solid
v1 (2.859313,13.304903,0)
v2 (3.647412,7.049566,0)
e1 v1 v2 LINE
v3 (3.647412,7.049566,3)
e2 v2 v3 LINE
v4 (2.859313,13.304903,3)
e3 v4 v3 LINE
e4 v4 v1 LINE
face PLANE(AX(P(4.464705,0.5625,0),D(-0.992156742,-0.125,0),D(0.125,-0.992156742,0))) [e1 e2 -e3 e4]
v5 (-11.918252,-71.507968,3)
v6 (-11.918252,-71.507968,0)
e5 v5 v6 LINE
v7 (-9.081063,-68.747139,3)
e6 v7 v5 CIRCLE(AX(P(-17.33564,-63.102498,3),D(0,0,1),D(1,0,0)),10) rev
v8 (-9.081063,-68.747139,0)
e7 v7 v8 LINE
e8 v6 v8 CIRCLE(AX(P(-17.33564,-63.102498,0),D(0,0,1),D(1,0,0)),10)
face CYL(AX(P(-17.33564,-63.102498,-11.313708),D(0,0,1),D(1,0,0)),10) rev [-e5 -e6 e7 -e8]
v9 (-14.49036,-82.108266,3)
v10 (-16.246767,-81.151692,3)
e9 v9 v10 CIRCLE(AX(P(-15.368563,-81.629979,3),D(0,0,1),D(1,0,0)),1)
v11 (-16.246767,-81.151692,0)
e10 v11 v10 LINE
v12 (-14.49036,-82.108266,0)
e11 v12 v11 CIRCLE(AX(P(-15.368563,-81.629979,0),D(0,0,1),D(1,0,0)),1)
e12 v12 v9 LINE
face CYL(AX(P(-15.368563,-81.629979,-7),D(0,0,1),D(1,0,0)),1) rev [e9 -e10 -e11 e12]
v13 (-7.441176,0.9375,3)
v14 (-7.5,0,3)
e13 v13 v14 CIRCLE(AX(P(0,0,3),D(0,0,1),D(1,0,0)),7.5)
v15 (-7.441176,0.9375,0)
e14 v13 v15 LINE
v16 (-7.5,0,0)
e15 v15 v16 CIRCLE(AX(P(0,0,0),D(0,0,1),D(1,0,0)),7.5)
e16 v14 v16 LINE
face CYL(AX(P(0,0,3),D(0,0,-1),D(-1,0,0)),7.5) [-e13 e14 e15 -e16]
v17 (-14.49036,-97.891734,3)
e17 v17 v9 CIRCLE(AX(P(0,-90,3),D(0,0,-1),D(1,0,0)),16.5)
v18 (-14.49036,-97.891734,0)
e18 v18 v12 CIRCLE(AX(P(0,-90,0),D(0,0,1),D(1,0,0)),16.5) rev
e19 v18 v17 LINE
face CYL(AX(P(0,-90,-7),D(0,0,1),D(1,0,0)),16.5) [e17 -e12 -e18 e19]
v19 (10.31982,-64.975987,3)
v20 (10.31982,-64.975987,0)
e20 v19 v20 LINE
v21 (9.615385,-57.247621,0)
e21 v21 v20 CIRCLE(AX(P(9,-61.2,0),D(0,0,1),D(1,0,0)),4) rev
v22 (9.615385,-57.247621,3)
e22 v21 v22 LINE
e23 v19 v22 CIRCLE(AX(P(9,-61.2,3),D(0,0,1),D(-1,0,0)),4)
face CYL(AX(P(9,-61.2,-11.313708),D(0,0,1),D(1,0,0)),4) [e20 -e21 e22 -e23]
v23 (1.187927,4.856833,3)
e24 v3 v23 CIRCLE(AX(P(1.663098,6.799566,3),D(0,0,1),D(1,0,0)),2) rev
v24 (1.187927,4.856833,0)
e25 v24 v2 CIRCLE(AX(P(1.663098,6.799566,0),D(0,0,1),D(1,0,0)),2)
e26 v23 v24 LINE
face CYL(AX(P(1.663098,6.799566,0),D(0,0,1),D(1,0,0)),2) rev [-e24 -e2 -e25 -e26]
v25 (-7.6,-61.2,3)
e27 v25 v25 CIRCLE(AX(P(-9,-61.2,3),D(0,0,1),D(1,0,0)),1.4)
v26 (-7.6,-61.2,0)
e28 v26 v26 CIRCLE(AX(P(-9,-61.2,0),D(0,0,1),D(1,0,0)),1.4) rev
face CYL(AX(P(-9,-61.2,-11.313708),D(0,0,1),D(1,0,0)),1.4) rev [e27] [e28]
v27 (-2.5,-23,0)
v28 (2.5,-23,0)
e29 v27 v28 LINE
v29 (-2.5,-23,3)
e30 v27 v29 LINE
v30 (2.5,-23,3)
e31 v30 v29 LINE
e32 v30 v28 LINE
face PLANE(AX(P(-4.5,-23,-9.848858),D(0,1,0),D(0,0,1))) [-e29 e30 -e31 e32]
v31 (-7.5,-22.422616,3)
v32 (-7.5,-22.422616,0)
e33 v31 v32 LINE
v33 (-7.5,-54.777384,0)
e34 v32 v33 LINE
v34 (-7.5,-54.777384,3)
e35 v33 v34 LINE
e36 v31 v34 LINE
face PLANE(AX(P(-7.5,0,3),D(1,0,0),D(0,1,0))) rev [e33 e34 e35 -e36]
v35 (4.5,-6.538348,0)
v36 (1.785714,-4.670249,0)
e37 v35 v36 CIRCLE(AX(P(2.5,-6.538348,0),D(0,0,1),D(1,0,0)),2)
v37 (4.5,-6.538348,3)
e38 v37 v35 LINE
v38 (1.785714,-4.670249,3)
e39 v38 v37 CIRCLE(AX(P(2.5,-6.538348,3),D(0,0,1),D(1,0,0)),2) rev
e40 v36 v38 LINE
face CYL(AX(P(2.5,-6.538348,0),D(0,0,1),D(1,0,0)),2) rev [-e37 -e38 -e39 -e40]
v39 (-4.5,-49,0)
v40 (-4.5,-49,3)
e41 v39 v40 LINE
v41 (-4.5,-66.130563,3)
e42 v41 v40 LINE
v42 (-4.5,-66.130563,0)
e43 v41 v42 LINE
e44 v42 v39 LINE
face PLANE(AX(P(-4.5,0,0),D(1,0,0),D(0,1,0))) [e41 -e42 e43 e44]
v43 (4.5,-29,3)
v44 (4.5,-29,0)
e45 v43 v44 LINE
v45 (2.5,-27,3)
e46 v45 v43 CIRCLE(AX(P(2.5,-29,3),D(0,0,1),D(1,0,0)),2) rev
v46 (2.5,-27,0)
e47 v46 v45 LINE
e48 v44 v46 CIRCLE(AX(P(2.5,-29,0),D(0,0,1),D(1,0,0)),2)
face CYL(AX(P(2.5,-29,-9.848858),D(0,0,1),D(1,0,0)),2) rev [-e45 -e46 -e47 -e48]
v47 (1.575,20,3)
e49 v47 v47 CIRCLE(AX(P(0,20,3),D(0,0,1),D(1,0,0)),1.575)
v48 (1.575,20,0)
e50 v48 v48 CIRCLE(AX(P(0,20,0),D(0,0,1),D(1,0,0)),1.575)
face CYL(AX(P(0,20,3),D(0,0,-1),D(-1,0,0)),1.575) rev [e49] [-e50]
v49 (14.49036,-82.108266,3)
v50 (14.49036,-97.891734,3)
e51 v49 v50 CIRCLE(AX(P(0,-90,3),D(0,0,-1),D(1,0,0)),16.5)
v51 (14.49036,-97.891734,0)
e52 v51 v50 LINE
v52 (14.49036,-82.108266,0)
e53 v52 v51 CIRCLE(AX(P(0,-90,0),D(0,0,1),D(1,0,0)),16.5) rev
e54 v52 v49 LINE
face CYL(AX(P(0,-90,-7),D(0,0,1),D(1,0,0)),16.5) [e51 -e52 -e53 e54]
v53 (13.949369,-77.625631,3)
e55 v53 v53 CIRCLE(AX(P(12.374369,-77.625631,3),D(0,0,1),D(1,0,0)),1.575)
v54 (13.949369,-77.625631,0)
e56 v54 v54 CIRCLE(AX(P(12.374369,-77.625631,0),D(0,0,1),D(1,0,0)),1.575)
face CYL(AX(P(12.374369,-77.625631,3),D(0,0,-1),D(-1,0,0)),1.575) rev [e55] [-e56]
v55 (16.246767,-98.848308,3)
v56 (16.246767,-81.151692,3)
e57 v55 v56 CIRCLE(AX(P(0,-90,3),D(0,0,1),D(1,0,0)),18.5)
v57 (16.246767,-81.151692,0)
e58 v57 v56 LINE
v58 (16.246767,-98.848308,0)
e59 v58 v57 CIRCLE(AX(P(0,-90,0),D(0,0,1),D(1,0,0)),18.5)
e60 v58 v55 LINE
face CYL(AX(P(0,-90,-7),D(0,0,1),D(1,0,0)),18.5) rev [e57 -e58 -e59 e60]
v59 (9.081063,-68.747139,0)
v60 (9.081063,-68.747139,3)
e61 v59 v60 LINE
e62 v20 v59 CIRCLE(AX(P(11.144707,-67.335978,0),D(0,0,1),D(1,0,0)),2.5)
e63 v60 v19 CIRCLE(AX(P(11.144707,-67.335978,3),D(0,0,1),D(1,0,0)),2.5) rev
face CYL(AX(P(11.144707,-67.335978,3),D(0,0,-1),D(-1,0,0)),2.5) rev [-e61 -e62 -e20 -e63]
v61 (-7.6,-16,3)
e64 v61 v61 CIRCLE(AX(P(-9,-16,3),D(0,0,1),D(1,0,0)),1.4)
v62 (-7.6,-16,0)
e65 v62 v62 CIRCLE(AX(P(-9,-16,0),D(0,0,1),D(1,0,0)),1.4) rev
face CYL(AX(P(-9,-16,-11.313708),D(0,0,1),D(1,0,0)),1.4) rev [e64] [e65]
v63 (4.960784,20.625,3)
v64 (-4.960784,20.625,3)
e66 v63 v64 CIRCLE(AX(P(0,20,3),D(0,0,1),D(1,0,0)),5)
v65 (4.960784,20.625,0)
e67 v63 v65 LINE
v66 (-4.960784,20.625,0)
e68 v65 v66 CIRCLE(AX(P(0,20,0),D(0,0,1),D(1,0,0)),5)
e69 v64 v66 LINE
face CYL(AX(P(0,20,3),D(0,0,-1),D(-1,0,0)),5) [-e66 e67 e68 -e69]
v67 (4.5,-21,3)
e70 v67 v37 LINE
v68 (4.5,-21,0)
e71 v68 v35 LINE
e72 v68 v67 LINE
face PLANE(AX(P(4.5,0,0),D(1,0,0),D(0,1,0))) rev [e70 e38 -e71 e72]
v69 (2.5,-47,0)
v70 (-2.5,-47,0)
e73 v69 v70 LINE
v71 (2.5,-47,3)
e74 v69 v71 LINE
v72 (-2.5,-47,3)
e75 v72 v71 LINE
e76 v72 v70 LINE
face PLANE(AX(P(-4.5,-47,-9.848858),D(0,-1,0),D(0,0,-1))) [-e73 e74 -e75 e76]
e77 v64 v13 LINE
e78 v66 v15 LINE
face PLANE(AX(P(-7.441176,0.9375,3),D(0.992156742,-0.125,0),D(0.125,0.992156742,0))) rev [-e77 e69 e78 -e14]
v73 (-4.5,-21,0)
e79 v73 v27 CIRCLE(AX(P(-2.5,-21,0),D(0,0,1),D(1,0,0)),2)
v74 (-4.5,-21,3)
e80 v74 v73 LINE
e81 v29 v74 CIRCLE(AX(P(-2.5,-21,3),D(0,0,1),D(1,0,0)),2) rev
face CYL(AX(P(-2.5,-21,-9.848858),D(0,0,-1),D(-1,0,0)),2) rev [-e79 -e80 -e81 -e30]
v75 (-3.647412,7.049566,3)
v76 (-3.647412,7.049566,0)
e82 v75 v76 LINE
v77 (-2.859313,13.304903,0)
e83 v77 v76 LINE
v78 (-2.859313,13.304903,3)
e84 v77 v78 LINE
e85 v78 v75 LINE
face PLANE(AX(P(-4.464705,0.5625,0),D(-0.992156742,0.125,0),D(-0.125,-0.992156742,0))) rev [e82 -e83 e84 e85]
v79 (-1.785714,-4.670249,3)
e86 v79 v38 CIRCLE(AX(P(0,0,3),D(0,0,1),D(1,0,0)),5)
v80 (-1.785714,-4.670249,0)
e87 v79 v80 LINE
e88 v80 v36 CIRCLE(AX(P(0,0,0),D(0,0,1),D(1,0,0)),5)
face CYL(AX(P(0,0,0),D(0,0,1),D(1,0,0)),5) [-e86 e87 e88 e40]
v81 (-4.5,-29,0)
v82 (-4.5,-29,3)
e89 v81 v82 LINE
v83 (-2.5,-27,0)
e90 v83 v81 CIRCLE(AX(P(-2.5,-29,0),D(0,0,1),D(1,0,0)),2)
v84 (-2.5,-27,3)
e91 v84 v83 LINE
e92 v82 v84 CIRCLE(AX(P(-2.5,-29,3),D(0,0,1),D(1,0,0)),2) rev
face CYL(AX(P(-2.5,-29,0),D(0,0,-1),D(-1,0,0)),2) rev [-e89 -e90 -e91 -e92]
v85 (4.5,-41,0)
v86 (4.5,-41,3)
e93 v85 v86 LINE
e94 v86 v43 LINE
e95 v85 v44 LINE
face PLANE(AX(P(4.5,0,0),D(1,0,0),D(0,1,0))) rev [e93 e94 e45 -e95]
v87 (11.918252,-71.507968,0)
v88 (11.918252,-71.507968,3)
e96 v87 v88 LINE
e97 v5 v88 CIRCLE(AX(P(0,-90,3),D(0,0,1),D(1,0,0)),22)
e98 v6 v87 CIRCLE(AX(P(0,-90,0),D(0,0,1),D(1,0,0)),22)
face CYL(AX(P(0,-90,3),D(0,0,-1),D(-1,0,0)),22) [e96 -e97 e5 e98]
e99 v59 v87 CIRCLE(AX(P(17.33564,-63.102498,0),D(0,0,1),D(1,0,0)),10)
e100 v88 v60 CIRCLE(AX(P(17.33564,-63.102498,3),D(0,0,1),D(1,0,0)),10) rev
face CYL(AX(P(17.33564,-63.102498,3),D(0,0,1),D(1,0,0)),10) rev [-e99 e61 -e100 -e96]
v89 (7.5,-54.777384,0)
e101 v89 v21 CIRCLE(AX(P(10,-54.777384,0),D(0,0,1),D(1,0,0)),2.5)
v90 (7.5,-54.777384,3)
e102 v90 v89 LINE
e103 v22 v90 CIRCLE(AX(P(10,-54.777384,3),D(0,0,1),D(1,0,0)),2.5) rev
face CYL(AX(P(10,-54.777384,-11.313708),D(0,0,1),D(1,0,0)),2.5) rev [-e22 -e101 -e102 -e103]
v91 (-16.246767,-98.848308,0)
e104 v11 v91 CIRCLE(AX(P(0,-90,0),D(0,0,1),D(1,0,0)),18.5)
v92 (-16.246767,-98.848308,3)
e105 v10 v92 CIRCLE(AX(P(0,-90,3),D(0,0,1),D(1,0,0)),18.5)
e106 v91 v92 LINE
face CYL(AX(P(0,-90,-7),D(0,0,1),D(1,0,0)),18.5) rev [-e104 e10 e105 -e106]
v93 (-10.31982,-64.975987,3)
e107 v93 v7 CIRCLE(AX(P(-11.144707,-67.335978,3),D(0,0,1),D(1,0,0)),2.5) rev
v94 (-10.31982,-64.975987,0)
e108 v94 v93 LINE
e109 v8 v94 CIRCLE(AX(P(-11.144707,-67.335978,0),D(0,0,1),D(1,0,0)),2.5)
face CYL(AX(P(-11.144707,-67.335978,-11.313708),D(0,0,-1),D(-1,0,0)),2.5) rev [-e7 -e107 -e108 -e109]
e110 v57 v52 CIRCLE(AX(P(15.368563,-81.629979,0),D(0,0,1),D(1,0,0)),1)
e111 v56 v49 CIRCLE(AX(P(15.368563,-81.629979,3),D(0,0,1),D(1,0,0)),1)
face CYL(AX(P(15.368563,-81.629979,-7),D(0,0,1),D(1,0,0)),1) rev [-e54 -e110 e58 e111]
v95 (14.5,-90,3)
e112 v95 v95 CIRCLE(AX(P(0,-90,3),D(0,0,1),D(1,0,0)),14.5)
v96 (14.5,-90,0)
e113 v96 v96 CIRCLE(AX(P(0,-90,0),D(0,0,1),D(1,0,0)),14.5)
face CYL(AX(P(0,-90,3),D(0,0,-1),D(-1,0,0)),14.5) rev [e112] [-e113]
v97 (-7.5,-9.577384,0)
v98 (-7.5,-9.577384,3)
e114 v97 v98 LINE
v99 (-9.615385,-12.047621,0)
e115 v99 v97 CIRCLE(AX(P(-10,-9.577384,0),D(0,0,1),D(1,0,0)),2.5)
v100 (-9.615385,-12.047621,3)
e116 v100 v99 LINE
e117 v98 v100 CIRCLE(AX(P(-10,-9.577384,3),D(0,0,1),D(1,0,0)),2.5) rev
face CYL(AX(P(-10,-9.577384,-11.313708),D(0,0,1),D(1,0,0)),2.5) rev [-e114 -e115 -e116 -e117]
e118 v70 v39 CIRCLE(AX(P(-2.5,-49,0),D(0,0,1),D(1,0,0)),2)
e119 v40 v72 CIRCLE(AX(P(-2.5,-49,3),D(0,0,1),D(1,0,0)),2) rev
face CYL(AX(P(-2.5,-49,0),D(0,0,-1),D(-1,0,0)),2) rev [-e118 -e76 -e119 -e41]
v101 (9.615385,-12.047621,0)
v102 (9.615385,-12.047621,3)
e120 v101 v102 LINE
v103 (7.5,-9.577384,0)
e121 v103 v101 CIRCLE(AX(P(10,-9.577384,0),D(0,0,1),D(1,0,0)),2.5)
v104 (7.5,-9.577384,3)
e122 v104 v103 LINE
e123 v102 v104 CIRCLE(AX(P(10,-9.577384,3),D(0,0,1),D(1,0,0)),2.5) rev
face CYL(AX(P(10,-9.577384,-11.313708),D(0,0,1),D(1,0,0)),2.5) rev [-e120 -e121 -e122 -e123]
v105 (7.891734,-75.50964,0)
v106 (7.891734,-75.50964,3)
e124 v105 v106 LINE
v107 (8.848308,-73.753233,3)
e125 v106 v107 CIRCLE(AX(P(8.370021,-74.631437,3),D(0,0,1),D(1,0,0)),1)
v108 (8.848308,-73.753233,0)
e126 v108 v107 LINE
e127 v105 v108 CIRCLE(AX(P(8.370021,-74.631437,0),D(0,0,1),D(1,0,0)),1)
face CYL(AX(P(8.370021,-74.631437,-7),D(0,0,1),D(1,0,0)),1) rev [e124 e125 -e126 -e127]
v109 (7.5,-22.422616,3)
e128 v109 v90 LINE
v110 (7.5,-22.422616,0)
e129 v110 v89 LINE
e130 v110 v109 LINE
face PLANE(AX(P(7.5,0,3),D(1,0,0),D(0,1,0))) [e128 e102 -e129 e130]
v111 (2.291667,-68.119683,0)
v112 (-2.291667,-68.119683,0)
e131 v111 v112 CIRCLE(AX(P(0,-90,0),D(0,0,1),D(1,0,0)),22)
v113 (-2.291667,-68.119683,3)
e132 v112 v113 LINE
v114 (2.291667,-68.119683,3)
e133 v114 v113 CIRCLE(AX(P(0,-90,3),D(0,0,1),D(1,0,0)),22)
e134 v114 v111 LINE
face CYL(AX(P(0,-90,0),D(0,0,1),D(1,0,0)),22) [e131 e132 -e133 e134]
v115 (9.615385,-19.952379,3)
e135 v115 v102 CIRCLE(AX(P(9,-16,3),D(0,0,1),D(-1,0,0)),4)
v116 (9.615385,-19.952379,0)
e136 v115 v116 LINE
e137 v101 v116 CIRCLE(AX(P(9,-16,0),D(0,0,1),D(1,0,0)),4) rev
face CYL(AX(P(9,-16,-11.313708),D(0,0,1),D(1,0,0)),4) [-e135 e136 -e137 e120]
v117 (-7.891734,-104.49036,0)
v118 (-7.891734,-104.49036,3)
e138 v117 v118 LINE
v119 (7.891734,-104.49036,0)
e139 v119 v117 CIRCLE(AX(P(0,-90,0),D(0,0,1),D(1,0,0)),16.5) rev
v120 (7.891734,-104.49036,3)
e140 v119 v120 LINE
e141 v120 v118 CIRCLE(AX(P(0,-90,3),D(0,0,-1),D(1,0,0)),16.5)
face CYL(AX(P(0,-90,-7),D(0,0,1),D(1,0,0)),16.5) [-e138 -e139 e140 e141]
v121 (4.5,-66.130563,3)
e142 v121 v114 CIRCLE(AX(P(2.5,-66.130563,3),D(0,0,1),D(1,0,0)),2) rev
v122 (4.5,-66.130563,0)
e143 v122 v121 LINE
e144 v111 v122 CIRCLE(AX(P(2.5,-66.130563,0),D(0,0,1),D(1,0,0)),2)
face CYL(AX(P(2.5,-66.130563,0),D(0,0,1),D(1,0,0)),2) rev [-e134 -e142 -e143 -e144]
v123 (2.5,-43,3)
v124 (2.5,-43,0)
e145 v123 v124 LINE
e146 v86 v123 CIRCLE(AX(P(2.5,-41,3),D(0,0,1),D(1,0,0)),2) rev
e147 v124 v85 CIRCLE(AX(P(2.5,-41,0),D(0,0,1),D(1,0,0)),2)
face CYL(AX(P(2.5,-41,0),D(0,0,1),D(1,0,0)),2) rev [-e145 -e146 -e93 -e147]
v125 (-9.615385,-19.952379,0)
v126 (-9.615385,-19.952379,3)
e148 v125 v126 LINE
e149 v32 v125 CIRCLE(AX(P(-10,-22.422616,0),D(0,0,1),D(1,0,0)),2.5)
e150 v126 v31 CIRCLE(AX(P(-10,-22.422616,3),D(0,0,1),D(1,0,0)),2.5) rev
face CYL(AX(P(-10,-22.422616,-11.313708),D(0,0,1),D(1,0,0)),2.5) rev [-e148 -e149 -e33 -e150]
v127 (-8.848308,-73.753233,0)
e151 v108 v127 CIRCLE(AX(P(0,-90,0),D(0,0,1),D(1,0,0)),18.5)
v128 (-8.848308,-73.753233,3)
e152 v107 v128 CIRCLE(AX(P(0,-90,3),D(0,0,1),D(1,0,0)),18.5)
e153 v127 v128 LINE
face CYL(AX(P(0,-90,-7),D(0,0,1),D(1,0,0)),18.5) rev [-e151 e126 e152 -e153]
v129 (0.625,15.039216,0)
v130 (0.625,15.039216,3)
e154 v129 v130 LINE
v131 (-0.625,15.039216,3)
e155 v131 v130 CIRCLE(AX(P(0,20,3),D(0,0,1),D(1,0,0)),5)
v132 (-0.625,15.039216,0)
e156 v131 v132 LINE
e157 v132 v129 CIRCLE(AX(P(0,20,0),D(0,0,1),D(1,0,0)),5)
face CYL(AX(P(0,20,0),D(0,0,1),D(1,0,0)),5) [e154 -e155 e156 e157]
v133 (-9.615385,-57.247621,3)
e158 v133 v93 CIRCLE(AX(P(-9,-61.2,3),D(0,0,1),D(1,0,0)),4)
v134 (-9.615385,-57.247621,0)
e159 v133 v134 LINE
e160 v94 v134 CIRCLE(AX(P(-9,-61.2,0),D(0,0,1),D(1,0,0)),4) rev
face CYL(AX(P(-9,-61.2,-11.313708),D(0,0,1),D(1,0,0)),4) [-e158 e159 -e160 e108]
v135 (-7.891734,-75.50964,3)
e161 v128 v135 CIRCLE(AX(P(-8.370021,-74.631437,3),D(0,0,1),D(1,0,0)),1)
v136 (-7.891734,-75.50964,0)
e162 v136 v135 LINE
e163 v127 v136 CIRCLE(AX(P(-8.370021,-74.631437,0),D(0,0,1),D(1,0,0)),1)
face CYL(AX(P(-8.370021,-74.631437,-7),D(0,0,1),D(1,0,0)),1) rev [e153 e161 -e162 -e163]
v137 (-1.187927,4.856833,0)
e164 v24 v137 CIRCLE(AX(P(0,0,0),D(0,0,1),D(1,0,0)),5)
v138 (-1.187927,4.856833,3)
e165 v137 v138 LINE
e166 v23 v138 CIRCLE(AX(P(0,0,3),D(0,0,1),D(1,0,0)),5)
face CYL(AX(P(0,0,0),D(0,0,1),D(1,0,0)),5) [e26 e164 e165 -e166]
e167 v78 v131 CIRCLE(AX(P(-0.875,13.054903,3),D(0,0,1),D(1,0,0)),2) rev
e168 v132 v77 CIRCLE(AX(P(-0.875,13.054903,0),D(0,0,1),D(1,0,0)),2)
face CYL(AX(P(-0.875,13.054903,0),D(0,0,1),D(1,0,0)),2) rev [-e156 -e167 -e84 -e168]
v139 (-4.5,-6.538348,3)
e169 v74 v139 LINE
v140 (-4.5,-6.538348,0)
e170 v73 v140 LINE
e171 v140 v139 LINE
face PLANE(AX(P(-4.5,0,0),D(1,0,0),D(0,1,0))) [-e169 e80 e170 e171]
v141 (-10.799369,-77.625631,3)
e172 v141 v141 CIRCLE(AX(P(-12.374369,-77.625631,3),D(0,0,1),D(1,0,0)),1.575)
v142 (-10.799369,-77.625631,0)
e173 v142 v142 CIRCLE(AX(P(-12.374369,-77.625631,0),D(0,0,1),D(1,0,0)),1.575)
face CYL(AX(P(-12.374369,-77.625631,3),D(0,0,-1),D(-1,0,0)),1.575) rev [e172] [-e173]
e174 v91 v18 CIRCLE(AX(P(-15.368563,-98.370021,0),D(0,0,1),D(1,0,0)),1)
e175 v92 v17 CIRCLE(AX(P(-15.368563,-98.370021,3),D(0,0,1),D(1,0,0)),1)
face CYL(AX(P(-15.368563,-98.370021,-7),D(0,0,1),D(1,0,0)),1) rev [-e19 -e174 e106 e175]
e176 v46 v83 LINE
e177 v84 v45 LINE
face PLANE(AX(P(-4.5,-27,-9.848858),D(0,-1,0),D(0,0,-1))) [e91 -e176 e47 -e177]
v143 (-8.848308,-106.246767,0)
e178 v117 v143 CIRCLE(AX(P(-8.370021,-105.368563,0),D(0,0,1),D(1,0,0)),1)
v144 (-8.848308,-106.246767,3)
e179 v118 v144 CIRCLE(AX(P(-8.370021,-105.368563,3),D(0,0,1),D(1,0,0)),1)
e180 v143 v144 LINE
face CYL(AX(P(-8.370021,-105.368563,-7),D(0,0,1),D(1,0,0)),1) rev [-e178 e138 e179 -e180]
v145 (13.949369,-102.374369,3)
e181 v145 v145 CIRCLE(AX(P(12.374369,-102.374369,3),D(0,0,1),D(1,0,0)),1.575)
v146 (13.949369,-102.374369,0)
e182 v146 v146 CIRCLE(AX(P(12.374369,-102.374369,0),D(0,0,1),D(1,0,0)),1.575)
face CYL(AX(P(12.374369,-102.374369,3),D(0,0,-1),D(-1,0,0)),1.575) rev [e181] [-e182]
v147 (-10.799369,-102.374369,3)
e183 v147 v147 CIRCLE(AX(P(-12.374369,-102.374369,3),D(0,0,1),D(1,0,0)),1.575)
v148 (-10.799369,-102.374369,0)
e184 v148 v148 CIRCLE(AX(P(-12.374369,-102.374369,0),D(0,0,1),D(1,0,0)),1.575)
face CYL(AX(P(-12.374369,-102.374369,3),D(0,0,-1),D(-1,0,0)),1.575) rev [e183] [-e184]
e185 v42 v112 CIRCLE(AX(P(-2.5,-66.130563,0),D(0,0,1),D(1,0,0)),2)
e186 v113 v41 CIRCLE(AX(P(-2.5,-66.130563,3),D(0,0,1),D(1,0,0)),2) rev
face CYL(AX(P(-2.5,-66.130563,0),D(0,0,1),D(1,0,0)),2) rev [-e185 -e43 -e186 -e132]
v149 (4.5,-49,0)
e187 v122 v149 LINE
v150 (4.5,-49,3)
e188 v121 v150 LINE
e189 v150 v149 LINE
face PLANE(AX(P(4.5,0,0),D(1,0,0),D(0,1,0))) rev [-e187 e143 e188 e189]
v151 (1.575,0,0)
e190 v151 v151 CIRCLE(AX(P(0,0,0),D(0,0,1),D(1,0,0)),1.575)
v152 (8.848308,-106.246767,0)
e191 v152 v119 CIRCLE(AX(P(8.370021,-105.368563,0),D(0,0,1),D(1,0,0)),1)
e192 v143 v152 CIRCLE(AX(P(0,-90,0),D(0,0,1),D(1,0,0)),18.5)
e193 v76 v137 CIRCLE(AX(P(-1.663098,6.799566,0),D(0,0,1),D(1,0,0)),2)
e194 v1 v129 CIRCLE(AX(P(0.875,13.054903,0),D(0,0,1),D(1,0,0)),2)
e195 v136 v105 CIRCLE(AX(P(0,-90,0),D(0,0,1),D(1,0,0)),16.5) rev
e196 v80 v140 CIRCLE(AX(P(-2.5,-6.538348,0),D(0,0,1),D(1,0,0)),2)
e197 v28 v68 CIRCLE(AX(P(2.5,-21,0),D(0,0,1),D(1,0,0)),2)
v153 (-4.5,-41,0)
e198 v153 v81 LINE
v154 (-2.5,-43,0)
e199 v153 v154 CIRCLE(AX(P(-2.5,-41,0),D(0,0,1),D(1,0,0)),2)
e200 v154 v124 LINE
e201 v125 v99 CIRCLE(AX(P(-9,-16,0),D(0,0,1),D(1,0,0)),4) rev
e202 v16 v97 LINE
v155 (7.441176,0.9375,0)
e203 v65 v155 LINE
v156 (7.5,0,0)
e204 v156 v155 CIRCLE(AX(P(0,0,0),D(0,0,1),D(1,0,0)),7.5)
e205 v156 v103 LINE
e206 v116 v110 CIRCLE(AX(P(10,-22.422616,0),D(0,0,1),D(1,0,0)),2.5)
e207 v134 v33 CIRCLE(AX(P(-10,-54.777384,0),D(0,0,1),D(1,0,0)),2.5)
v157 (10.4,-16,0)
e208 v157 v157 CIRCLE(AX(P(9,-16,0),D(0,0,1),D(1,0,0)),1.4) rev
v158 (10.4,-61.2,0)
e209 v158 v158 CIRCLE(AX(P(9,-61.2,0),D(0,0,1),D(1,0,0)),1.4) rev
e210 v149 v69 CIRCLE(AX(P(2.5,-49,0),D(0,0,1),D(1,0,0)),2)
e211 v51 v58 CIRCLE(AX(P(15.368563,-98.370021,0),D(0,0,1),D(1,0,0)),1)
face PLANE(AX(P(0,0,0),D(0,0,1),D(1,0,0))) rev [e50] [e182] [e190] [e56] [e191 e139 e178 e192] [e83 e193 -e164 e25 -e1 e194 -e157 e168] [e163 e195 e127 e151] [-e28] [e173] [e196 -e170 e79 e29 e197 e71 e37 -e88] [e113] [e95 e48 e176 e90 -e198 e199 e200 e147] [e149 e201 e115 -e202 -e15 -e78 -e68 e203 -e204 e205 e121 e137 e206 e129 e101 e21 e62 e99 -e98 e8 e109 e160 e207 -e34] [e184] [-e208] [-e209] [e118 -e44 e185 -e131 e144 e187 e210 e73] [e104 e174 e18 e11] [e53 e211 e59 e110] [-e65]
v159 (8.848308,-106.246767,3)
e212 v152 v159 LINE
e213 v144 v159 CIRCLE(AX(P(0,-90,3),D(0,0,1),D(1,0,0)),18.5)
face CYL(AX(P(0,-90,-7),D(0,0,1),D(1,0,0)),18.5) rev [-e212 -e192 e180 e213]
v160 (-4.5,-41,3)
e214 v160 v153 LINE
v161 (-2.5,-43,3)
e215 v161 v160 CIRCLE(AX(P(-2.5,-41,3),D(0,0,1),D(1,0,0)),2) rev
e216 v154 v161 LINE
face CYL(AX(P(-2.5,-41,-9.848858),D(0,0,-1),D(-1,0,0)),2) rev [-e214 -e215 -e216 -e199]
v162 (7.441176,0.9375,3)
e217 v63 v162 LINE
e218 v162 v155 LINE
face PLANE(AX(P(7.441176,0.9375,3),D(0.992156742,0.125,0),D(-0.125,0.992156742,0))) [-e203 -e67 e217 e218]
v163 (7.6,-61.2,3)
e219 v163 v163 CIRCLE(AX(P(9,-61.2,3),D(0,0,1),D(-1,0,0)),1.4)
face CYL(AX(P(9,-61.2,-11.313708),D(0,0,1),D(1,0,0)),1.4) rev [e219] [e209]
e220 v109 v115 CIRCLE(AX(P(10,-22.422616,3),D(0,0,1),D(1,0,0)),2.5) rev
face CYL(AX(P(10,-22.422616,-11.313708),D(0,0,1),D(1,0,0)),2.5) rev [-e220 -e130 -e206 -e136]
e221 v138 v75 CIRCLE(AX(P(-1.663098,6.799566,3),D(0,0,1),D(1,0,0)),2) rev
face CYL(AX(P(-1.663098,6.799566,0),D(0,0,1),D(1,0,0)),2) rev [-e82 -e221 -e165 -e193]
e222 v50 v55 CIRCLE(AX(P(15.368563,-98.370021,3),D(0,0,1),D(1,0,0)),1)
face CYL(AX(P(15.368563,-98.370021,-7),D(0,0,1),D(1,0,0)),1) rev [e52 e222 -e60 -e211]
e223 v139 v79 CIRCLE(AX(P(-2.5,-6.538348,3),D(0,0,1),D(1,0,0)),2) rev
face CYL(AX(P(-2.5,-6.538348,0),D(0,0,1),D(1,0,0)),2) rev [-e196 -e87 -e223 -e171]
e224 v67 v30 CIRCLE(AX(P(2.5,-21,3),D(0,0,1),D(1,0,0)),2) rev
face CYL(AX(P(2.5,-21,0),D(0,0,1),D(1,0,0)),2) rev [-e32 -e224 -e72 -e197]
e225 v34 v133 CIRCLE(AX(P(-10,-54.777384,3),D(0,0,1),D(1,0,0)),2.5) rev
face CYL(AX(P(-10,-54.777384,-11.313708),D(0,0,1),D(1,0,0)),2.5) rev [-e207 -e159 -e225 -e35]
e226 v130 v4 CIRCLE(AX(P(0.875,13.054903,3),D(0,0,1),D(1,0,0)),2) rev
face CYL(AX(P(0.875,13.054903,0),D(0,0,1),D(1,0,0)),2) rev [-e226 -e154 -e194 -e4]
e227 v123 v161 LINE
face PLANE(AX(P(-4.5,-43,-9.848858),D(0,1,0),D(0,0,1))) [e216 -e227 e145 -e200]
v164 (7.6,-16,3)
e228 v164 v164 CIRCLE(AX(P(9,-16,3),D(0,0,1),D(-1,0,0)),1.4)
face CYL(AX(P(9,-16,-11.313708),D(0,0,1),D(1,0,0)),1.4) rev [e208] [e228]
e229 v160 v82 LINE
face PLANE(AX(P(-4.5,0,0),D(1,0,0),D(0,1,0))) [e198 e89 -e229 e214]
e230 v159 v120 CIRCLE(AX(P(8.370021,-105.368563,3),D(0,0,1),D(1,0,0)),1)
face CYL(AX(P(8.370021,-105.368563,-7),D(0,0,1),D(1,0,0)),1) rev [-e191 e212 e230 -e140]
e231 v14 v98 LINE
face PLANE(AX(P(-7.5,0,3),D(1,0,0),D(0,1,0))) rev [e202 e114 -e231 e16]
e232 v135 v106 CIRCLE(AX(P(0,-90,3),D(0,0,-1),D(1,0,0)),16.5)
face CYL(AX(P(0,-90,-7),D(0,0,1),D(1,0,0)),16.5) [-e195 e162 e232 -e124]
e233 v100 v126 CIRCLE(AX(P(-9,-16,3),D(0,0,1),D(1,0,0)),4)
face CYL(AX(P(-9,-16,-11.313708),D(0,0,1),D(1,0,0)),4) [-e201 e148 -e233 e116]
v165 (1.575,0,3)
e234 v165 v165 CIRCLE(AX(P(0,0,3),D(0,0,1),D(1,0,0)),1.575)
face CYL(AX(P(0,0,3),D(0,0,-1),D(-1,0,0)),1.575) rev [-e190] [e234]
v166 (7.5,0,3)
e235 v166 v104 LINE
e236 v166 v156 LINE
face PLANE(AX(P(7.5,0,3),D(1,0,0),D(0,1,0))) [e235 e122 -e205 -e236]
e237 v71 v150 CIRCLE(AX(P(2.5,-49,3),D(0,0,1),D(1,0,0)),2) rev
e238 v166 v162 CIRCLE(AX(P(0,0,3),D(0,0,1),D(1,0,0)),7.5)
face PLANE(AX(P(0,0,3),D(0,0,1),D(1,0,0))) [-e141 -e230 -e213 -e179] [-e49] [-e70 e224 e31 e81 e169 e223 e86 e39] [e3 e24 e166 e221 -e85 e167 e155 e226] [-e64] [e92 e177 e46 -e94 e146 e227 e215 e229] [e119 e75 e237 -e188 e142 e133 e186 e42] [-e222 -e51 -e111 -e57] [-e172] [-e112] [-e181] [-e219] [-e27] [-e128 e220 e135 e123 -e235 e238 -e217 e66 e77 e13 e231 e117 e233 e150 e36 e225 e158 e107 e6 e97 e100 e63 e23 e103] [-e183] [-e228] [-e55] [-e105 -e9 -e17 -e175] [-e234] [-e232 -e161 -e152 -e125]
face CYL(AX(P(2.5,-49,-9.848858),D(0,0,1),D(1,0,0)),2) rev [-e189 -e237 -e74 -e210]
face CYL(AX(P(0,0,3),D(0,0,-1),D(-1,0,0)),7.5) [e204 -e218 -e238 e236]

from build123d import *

# Parameters (mm, degrees)
SKETCH_1_R          = 1.575
SKETCH_1_R_2        = 14.5
EXTRUDE_1_DEPTH     = 3
CUT_EXTRUDE_START   = -3
CUT_EXTRUDE_1_DEPTH = 3
SKETCH_3_W          = 9
SKETCH_3_H          = 4
EXTRUDE_2_DEPTH     = 3
SKETCH_4_R          = 4
SKETCH_4_R_2        = 1.4
EXTRUDE_3_DEPTH     = 3
FILLET_1_R          = 2
FILLET_2_R          = 10
FILLET_3_R          = 2.5
CUT_EXTRUDE_2_DEPTH = 10


with BuildPart() as part:
    # 草图1 → 凸台-拉伸1 (new body)
    with BuildSketch(Plane.XY):
        with BuildLine():
            ThreePointArc((7.5, 0), (7.485279444, 0.469671844), (7.441175562, 0.9375))
            Line((7.441175562, 0.9375), (4.960783708, 20.625))
            ThreePointArc((4.960783708, 20.625), (0, 25), (-4.960783708, 20.625))
            Line((-4.960783708, 20.625), (-7.441175562, 0.9375))
            ThreePointArc((-7.441175562, 0.9375), (-7.485279444, 0.469671844), (-7.5, 0))
            Line((-7.5, 0), (-7.5, -69.31788212))
            ThreePointArc((-7.5, -69.31788212), (0, -112), (7.5, -69.31788212))
            Line((7.5, -69.31788212), (7.5, 0))
        make_face()
        with Locations((-12.374368671, -102.374368671)):
            Circle(SKETCH_1_R, mode=Mode.SUBTRACT)
        with Locations((-12.374368671, -77.625631329)):
            Circle(SKETCH_1_R, mode=Mode.SUBTRACT)
        with Locations((0, -90)):
            Circle(SKETCH_1_R_2, mode=Mode.SUBTRACT)
        with Locations((12.374368671, -102.374368671)):
            Circle(SKETCH_1_R, mode=Mode.SUBTRACT)
        with Locations((12.374368671, -77.625631329)):
            Circle(SKETCH_1_R, mode=Mode.SUBTRACT)
        Circle(SKETCH_1_R, mode=Mode.SUBTRACT)
        with Locations((0, 20)):
            Circle(SKETCH_1_R, mode=Mode.SUBTRACT)
    extrude(amount=EXTRUDE_1_DEPTH)

    # 草图2 → 切除-拉伸1 (cut)
    with BuildSketch(Plane.XY.offset(3).offset(CUT_EXTRUDE_START)):
        with BuildLine():
            Line((0, -68), (0, -5))
            ThreePointArc((0, -5), (-2.655442773, -4.236581603), (-4.5, -2.179449472))
            Line((-4.5, -2.179449472), (-4.5, -68.465144533))
            ThreePointArc((-4.5, -68.465144533), (-2.261988032, -68.116595097), (0, -68))
        make_face()
        with BuildLine():
            ThreePointArc((4.5, -2.179449472), (2.655442773, -4.236581603), (0, -5))
            Line((0, -5), (0, -68))
            ThreePointArc((0, -68), (2.261988032, -68.116595097), (4.5, -68.465144533))
            Line((4.5, -68.465144533), (4.5, -2.179449472))
        make_face()
        with BuildLine():
            Line((-2.557135445, 15.70336663), (-4.192274153, 2.724855487))
            ThreePointArc((-4.192274153, 2.724855487), (0, 5), (4.192274153, 2.724855487))
            Line((4.192274153, 2.724855487), (2.557135445, 15.70336663))
            ThreePointArc((2.557135445, 15.70336663), (0, 15), (-2.557135445, 15.70336663))
        make_face()
    extrude(amount=CUT_EXTRUDE_1_DEPTH, mode=Mode.SUBTRACT)

    # 草图3 → 凸台-拉伸2 (add)
    with BuildSketch(Plane.XY.offset(3)):
        with Locations((0, -45)):
            Rectangle(SKETCH_3_W, SKETCH_3_H)
        with Locations((0, -25)):
            Rectangle(SKETCH_3_W, SKETCH_3_H)
    extrude(amount=-EXTRUDE_2_DEPTH)

    # 草图4 → 凸台-拉伸3 (add)
    # profile 1 of 4: a face of its own
    with BuildSketch(Plane.XY.offset(3)):
        with Locations((-9, -16)):
            Circle(SKETCH_4_R)
        with Locations((-9, -16)):
            Circle(SKETCH_4_R_2, mode=Mode.SUBTRACT)
    # profile 2 of 4: a face of its own
    with BuildSketch(Plane.XY.offset(3)):
        with Locations((-9, -61.2)):
            Circle(SKETCH_4_R)
        with Locations((-9, -61.2)):
            Circle(SKETCH_4_R_2, mode=Mode.SUBTRACT)
    # profile 3 of 4: a face of its own
    with BuildSketch(Plane.XY.offset(3)):
        with Locations((9, -61.2)):
            Circle(SKETCH_4_R)
        with Locations((9, -61.2)):
            Circle(SKETCH_4_R_2, mode=Mode.SUBTRACT)
    # profile 4 of 4: a face of its own
    with BuildSketch(Plane.XY.offset(3)):
        with Locations((9, -16)):
            Circle(SKETCH_4_R)
        with Locations((9, -16)):
            Circle(SKETCH_4_R_2, mode=Mode.SUBTRACT)
    extrude(amount=-EXTRUDE_3_DEPTH)

    # 圆角1
    fillet_1_edges = [part.edges().sort_by_distance(p)[0] for p in [
        (-4.5, -27, 1.5),
        (-4.5, -23, 1.5),
        (4.5, -23, 1.5),
        (4.5, -27, 1.5),
        (-2.557135445, 15.70336663, 1.5),
        (2.557135445, 15.70336663, 1.5),
        (4.192274153, 2.724855487, 1.5),
        (-4.192274153, 2.724855487, 1.5),
        (4.5, -68.465144533, 1.5),
        (-4.5, -68.465144533, 1.5),
        (-4.5, -2.179449472, 1.5),
        (4.5, -2.179449472, 1.5),
        (-4.5, -47, 1.5),
        (-4.5, -43, 1.5),
        (4.5, -43, 1.5),
        (4.5, -47, 1.5),
    ]]
    fillet(fillet_1_edges, radius=FILLET_1_R)

    # 圆角2
    # the kernel refuses this fillet: 10 mm, written as the material it adds along each edge
    with BuildSketch(Plane(origin=(-7.5, -69.31788212, 0), x_dir=(-0.8959663420766752, -0.44412195832422213, 0), z_dir=(0, 0, 1))) as fillet_2_piece_1:
        with BuildLine():
            CenterArc((6.0520135, -9.936998269), FILLET_2_R, 96.434905118, 46.795533404)
            Line((-1.958481407, -3.951017033), (-2.118691305, -3.831297409))
            ThreePointArc((-2.118691305, -3.831297409), (-1.158433972, -1.886684125), (-0.179193268, 0.088824392))
            Line((-0.179193268, 0.088824392), (0.022414865, 0.198739965))
            ThreePointArc((0.022414865, 0.198739965), (2.46563513, 0.061396191), (4.908855394, 0.198739965))
            Line((4.908855394, 0.198739965), (4.931270259, 0))
        make_face()
    extrude(amount=3)
    with BuildSketch(Plane(origin=(7.5, -69.31788212, 0), x_dir=(0.8959663420766733, -0.44412195832422613, 0), z_dir=(0, 0, 1))) as fillet_2_piece_2:
        with BuildLine():
            CenterArc((6.0520135, 9.936998269), FILLET_2_R, 216.769561479, 46.795533404)
            Line((-1.958481407, 3.951017033), (-2.118691305, 3.831297409))
            ThreePointArc((-2.118691305, 3.831297409), (-1.158433972, 1.886684125), (-0.179193268, -0.088824392))
            Line((-0.179193268, -0.088824392), (0.022414865, -0.198739965))
            ThreePointArc((0.022414865, -0.198739965), (2.46563513, -0.061396191), (4.908855394, -0.198739965))
            Line((4.908855394, -0.198739965), (4.931270259, 0))
        make_face()
    extrude(amount=3)

    # 圆角3
    fillet_3_edges = [part.edges().sort_by_distance(p)[0] for p in [
        (-7.5, -64.908099244, 1.5),
        (-7.5, -57.491900756, 1.5),
        (7.5, -64.908099244, 1.5),
        (7.5, -57.491900756, 1.5),
        (-7.5, -12.291900756, 1.5),
        (-7.5, -19.708099244, 1.5),
        (7.5, -12.291900756, 1.5),
        (7.5, -19.708099244, 1.5),
    ]]
    fillet(fillet_3_edges, radius=FILLET_3_R)

    # 草图5 → 切除-拉伸2 (cut)
    with BuildSketch(Plane.XY.offset(3)):
        with BuildLine():
            ThreePointArc((8.848308271, -73.753232914), (0, -71.5), (-8.848308271, -73.753232914))
            ThreePointArc((-8.848308271, -73.753232914), (-9.248224964, -75.109723474), (-7.891734404, -75.509640167))
            ThreePointArc((-7.891734404, -75.509640167), (1.6e-08, -73.5), (7.891734432, -75.509640182))
            ThreePointArc((7.891734432, -75.509640182), (9.248224971, -75.10972346), (8.848308271, -73.753232914))
        make_face()
        with BuildLine():
            ThreePointArc((16.246767086, -81.151691729), (14.890276526, -80.751775036), (14.490359833, -82.108265596))
            ThreePointArc((14.490359833, -82.108265596), (16.5, -90.000000016), (14.490359818, -97.891734432))
            ThreePointArc((14.490359818, -97.891734432), (14.89027654, -99.248224971), (16.246767086, -98.848308271))
            ThreePointArc((16.246767086, -98.848308271), (18.5, -90), (16.246767086, -81.151691729))
        make_face()
        with BuildLine():
            ThreePointArc((8.848308271, -106.246767086), (9.248224964, -104.890276526), (7.891734404, -104.490359833))
            ThreePointArc((7.891734404, -104.490359833), (-1.6e-08, -106.5), (-7.891734432, -104.490359818))
            ThreePointArc((-7.891734432, -104.490359818), (-9.248224971, -104.89027654), (-8.848308271, -106.246767086))
            ThreePointArc((-8.848308271, -106.246767086), (0, -108.5), (8.848308271, -106.246767086))
        make_face()
        with BuildLine():
            ThreePointArc((-16.246767086, -98.848308271), (-14.890276526, -99.248224964), (-14.490359833, -97.891734404))
            ThreePointArc((-14.490359833, -97.891734404), (-16.5, -89.999999984), (-14.490359818, -82.108265568))
            ThreePointArc((-14.490359818, -82.108265568), (-14.89027654, -80.751775029), (-16.246767086, -81.151691729))
            ThreePointArc((-16.246767086, -81.151691729), (-18.5, -90), (-16.246767086, -98.848308271))
        make_face()
    extrude(amount=-CUT_EXTRUDE_2_DEPTH, mode=Mode.SUBTRACT)


solid = part.part
